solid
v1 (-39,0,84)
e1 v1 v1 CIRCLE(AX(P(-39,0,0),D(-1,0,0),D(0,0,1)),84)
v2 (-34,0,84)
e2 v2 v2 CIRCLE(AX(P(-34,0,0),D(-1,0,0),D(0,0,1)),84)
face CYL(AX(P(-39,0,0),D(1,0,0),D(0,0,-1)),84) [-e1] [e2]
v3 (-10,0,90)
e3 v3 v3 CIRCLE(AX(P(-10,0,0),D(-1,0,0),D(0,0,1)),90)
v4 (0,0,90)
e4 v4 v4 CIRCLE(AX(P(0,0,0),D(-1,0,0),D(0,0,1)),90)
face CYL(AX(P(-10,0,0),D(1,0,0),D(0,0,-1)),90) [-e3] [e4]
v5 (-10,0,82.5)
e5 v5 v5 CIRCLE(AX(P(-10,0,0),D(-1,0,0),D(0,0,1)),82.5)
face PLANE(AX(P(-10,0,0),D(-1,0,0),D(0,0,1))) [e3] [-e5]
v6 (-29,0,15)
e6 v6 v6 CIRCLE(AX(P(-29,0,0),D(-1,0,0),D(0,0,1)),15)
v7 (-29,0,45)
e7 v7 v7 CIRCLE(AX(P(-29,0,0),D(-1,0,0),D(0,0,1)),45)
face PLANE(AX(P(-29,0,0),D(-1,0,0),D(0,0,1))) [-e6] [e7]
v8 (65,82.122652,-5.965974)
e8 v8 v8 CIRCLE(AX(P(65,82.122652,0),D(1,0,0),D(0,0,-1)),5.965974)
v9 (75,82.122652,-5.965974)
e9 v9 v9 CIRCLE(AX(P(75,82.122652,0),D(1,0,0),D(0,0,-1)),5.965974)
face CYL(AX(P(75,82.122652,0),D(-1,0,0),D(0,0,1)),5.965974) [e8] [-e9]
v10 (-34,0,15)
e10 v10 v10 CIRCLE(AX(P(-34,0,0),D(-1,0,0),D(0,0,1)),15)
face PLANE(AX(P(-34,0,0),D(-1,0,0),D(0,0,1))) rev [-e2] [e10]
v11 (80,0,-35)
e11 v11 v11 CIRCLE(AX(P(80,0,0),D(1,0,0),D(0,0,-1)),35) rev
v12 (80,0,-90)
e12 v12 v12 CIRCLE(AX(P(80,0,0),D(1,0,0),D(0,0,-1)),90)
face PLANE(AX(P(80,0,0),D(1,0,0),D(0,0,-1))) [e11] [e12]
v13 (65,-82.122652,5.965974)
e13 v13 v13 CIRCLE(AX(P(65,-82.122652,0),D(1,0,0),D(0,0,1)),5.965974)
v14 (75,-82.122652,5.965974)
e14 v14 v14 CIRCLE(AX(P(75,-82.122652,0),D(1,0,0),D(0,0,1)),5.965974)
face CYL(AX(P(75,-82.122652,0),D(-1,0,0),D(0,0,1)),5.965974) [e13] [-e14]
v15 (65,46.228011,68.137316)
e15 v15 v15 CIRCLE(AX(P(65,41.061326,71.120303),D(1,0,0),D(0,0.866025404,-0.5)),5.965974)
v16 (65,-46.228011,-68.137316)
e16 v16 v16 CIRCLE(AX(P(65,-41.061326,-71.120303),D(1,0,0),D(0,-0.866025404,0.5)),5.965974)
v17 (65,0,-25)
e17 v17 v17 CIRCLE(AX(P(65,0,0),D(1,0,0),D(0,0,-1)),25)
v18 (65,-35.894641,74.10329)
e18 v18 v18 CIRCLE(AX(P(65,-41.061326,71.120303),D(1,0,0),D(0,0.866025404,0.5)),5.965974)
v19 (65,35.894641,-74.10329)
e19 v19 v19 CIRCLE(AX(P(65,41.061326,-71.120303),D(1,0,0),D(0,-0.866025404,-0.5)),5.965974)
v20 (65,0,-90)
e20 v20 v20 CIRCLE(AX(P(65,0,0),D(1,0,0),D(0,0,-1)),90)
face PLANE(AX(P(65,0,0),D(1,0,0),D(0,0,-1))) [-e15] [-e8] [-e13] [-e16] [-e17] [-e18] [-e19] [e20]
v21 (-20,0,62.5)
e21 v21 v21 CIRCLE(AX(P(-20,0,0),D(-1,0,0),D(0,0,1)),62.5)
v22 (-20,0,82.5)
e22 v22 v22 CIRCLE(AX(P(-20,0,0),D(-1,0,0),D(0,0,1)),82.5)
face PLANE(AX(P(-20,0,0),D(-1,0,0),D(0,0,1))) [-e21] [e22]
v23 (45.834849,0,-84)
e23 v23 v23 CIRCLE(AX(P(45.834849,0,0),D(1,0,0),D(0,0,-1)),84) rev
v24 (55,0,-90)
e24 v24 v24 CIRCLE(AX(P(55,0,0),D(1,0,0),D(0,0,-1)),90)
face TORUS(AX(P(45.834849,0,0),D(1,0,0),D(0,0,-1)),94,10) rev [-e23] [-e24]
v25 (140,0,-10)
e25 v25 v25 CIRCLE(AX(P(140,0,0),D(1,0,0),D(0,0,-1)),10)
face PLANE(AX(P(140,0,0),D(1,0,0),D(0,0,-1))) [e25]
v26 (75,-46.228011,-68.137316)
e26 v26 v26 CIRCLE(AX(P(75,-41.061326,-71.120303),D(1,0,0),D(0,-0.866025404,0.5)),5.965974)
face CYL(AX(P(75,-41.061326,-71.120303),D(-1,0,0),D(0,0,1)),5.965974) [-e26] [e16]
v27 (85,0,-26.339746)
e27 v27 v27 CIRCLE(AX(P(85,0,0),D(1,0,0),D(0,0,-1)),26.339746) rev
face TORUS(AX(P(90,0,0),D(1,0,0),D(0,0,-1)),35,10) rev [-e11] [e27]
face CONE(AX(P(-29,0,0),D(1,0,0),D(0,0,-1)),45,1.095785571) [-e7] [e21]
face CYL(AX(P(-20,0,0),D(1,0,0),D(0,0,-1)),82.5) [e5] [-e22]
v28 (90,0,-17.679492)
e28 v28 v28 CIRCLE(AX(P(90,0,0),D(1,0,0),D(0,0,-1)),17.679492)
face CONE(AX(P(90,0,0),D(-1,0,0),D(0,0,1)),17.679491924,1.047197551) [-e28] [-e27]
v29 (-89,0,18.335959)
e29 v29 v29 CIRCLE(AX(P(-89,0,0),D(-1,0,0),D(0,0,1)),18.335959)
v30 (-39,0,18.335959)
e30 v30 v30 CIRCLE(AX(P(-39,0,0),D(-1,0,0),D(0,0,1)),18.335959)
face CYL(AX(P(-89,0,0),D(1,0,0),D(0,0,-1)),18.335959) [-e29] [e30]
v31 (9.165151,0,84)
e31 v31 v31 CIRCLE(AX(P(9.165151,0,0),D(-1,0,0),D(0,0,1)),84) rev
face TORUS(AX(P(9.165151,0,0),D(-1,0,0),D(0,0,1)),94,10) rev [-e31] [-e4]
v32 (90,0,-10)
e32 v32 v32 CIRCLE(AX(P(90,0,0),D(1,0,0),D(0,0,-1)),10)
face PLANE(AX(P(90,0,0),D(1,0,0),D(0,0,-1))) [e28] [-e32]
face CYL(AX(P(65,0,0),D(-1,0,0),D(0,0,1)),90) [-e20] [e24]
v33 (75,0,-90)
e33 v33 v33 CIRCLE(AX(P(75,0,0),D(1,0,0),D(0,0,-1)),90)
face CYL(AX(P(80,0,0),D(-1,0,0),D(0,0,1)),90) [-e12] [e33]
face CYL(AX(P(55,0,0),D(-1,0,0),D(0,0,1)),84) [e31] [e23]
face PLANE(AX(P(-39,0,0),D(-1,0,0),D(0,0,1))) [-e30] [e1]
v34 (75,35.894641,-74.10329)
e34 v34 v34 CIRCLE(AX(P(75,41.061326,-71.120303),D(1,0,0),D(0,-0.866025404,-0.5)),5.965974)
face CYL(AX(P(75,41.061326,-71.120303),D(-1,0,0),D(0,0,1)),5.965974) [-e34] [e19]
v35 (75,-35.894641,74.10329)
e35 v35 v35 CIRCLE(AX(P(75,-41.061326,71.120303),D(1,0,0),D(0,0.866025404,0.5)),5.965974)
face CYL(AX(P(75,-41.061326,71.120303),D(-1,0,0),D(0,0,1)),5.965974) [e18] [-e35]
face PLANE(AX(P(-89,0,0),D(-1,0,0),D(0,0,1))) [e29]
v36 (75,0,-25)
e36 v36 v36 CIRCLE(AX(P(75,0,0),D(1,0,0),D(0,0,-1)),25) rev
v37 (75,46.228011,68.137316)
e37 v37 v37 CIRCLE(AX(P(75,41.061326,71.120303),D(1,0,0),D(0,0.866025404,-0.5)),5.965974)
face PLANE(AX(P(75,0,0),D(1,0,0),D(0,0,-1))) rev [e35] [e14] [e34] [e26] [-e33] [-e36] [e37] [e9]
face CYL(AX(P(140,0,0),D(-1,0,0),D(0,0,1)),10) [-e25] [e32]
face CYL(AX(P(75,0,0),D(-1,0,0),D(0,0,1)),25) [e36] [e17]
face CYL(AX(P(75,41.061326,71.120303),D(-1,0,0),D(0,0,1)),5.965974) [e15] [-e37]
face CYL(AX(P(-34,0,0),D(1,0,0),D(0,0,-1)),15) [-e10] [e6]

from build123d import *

# Parameters (mm, degrees)
SKETCH1_R            = 84
BOSS_EXTRUDE1_DEPTH  = 55
SKETCH2_R            = 90
BOSS_EXTRUDE2_DEPTH  = 10
BOSS_EXTRUDE3_START  = 10
SKETCH3_R            = 90
BOSS_EXTRUDE3_DEPTH  = 10
SKETCH4_R            = 82.5
BOSS_EXTRUDE4_DEPTH  = 10
SKETCH5_R            = 62.5
SKETCH6_R            = 45
SKETCH7_R            = 15
BOSS_EXTRUDE5_DEPTH  = 5
BOSS_EXTRUDE6_START  = 5
SKETCH8_R            = 84
BOSS_EXTRUDE6_DEPTH  = 5
SKETCH9_R            = 18.335958802
BOSS_EXTRUDE7_DEPTH  = 50
SKETCH10_R           = 5.965973997
BOSS_EXTRUDE8_DEPTH  = 10
CIRPATTERN1_COUNT    = 6
SKETCH11_R           = 90
BOSS_EXTRUDE9_DEPTH  = 5
SKETCH12_R           = 25
BOSS_EXTRUDE10_DEPTH = 10
FILLET3_R            = 10
FILLET4_R            = 10
SKETCH13_R           = 25
BOSS_EXTRUDE11_DEPTH = 10
SKETCH14_R           = 10
BOSS_EXTRUDE12_DEPTH = 50
FILLET6_R            = 10


with BuildPart() as part:
    # Sketch1 → Boss-Extrude1 (new body)
    with BuildSketch(Plane(origin=(0, 0, 0), x_dir=(0, 0, -1), z_dir=(1, 0, 0))):
        Circle(SKETCH1_R)
    extrude(amount=BOSS_EXTRUDE1_DEPTH)

    # Sketch2 → Boss-Extrude2 (add)
    with BuildSketch(Plane(origin=(55, 0, 0), x_dir=(0, 0, -1), z_dir=(1, 0, 0))):
        Circle(SKETCH2_R)
    extrude(amount=BOSS_EXTRUDE2_DEPTH)

    # Sketch3 → Boss-Extrude3 (add)
    with BuildSketch(Plane.ZY.offset(BOSS_EXTRUDE3_START)):
        with Locations(Location((0, 0, 0), (0, 0, 180))):
            Circle(SKETCH3_R)
    extrude(amount=-BOSS_EXTRUDE3_DEPTH)

    # Sketch4 → Boss-Extrude4 (add)
    with BuildSketch(Plane.ZY.offset(10)):
        Circle(SKETCH4_R)
    extrude(amount=BOSS_EXTRUDE4_DEPTH)

    # Sketch5 → Loft1 section 0
    with BuildSketch(Plane.ZY.offset(20)):
        Circle(SKETCH5_R)
    # Sketch6 → Loft1 section 1
    with BuildSketch(Plane.ZY.offset(29)):
        Circle(SKETCH6_R)
    loft()

    # Sketch7 → Boss-Extrude5 (add)
    with BuildSketch(Plane.ZY.offset(29)):
        Circle(SKETCH7_R)
    extrude(amount=BOSS_EXTRUDE5_DEPTH)

    # Sketch8 → Boss-Extrude6 (add)
    with BuildSketch(Plane.ZY.offset(34).offset(BOSS_EXTRUDE6_START)):
        Circle(SKETCH8_R)
    extrude(amount=-BOSS_EXTRUDE6_DEPTH)

    # Sketch9 → Boss-Extrude7 (add)
    with BuildSketch(Plane.ZY.offset(39)):
        Circle(SKETCH9_R)
    extrude(amount=BOSS_EXTRUDE7_DEPTH)

    # Sketch10 → Boss-Extrude8 (add)
    with BuildSketch(Plane(origin=(65, 0, 0), x_dir=(0, 0, -1), z_dir=(1, 0, 0))):
        with Locations((0, 82.122651967)):
            Circle(SKETCH10_R)
    boss_extrude8 = extrude(amount=BOSS_EXTRUDE8_DEPTH)

    # CirPattern1: Boss-Extrude8 ×6 about axis
    cirpattern1_axis = Axis((0, 0, 0), (1, 0, 0))
    for i in range(1, CIRPATTERN1_COUNT):
        add(boss_extrude8.rotate(cirpattern1_axis, i * 360 / CIRPATTERN1_COUNT))

    # Sketch11 → Boss-Extrude9 (add)
    with BuildSketch(Plane(origin=(75, 0, 0), x_dir=(0, 0, -1), z_dir=(1, 0, 0))):
        Circle(SKETCH11_R)
    extrude(amount=BOSS_EXTRUDE9_DEPTH)

    # Sketch12 → Boss-Extrude10 (add)
    with BuildSketch(Plane(origin=(65, 0, 0), x_dir=(0, 0, -1), z_dir=(1, 0, 0))):
        Circle(SKETCH12_R)
    extrude(amount=BOSS_EXTRUDE10_DEPTH)

    # Fillet3
    # the kernel refuses this fillet: 10 mm, written as the material it adds along each edge
    with BuildSketch(Plane(origin=(0, 0, 0), x_dir=(0, 0, -1), z_dir=(0, -1, 0))) as fillet3_piece_1:
        with BuildLine():
            CenterArc((94, 9.16515139), FILLET3_R, 180, 66.421821522)
            Line((90, 0), (89.92, -0.183303028))
            ThreePointArc((89.92, -0.183303028), (87, -0.2), (84, -0.2))
            Line((84, -0.2), (83.8, 0))
            Line((83.8, 0), (83.8, 9.16515139))
            Line((83.8, 9.16515139), (84, 9.16515139))
        make_face()
    revolve(axis=Axis((0, 0, 0), (1, 0, 0)))

    # Fillet4
    # the kernel refuses this fillet: 10 mm, written as the material it adds along each edge
    with BuildSketch(Plane(origin=(55, 0, 0), x_dir=(0, 0, -1), z_dir=(0, -1, 0))) as fillet4_piece_1:
        with BuildLine():
            CenterArc((94, -9.16515139), FILLET4_R, 113.578178478, 66.421821522)
            Line((90, 0), (89.92, 0.183303028))
            ThreePointArc((89.92, 0.183303028), (87, 0.2), (84, 0.2))
            Line((84, 0.2), (83.8, 0))
            Line((83.8, 0), (83.8, -9.16515139))
            Line((83.8, -9.16515139), (84, -9.16515139))
        make_face()
    revolve(axis=Axis((55, 0, 0), (1, 0, 0)))

    # Sketch13 → Boss-Extrude11 (add)
    with BuildSketch(Plane(origin=(80, 0, 0), x_dir=(0, 0, -1), z_dir=(1, 0, 0))):
        Circle(SKETCH13_R)
    extrude(amount=BOSS_EXTRUDE11_DEPTH)

    # Sketch14 → Boss-Extrude12 (add)
    with BuildSketch(Plane(origin=(90, 0, 0), x_dir=(0, 0, -1), z_dir=(1, 0, 0))):
        Circle(SKETCH14_R)
    extrude(amount=BOSS_EXTRUDE12_DEPTH)

    # Fillet6
    fillet6_edges = [part.edges().sort_by_distance(p)[0] for p in [
        (80, 0, 25),
    ]]
    fillet(fillet6_edges, radius=FILLET6_R - 0.0001)  # a hair under: the kernel refuses the full size

    # Chamfer1: read off the stored shape, not the designer's step
    # Chamfer1 outline → Chamfer1 (revolve, cut)
    with BuildSketch(Plane.YX):
        Polygon((26.339745962, 90), (17.679491924, 90), (26.339745962, 85), align=None)
    revolve(axis=Axis((0, 0, 0), (1, 0, 0)), mode=Mode.SUBTRACT)


solid = part.part
